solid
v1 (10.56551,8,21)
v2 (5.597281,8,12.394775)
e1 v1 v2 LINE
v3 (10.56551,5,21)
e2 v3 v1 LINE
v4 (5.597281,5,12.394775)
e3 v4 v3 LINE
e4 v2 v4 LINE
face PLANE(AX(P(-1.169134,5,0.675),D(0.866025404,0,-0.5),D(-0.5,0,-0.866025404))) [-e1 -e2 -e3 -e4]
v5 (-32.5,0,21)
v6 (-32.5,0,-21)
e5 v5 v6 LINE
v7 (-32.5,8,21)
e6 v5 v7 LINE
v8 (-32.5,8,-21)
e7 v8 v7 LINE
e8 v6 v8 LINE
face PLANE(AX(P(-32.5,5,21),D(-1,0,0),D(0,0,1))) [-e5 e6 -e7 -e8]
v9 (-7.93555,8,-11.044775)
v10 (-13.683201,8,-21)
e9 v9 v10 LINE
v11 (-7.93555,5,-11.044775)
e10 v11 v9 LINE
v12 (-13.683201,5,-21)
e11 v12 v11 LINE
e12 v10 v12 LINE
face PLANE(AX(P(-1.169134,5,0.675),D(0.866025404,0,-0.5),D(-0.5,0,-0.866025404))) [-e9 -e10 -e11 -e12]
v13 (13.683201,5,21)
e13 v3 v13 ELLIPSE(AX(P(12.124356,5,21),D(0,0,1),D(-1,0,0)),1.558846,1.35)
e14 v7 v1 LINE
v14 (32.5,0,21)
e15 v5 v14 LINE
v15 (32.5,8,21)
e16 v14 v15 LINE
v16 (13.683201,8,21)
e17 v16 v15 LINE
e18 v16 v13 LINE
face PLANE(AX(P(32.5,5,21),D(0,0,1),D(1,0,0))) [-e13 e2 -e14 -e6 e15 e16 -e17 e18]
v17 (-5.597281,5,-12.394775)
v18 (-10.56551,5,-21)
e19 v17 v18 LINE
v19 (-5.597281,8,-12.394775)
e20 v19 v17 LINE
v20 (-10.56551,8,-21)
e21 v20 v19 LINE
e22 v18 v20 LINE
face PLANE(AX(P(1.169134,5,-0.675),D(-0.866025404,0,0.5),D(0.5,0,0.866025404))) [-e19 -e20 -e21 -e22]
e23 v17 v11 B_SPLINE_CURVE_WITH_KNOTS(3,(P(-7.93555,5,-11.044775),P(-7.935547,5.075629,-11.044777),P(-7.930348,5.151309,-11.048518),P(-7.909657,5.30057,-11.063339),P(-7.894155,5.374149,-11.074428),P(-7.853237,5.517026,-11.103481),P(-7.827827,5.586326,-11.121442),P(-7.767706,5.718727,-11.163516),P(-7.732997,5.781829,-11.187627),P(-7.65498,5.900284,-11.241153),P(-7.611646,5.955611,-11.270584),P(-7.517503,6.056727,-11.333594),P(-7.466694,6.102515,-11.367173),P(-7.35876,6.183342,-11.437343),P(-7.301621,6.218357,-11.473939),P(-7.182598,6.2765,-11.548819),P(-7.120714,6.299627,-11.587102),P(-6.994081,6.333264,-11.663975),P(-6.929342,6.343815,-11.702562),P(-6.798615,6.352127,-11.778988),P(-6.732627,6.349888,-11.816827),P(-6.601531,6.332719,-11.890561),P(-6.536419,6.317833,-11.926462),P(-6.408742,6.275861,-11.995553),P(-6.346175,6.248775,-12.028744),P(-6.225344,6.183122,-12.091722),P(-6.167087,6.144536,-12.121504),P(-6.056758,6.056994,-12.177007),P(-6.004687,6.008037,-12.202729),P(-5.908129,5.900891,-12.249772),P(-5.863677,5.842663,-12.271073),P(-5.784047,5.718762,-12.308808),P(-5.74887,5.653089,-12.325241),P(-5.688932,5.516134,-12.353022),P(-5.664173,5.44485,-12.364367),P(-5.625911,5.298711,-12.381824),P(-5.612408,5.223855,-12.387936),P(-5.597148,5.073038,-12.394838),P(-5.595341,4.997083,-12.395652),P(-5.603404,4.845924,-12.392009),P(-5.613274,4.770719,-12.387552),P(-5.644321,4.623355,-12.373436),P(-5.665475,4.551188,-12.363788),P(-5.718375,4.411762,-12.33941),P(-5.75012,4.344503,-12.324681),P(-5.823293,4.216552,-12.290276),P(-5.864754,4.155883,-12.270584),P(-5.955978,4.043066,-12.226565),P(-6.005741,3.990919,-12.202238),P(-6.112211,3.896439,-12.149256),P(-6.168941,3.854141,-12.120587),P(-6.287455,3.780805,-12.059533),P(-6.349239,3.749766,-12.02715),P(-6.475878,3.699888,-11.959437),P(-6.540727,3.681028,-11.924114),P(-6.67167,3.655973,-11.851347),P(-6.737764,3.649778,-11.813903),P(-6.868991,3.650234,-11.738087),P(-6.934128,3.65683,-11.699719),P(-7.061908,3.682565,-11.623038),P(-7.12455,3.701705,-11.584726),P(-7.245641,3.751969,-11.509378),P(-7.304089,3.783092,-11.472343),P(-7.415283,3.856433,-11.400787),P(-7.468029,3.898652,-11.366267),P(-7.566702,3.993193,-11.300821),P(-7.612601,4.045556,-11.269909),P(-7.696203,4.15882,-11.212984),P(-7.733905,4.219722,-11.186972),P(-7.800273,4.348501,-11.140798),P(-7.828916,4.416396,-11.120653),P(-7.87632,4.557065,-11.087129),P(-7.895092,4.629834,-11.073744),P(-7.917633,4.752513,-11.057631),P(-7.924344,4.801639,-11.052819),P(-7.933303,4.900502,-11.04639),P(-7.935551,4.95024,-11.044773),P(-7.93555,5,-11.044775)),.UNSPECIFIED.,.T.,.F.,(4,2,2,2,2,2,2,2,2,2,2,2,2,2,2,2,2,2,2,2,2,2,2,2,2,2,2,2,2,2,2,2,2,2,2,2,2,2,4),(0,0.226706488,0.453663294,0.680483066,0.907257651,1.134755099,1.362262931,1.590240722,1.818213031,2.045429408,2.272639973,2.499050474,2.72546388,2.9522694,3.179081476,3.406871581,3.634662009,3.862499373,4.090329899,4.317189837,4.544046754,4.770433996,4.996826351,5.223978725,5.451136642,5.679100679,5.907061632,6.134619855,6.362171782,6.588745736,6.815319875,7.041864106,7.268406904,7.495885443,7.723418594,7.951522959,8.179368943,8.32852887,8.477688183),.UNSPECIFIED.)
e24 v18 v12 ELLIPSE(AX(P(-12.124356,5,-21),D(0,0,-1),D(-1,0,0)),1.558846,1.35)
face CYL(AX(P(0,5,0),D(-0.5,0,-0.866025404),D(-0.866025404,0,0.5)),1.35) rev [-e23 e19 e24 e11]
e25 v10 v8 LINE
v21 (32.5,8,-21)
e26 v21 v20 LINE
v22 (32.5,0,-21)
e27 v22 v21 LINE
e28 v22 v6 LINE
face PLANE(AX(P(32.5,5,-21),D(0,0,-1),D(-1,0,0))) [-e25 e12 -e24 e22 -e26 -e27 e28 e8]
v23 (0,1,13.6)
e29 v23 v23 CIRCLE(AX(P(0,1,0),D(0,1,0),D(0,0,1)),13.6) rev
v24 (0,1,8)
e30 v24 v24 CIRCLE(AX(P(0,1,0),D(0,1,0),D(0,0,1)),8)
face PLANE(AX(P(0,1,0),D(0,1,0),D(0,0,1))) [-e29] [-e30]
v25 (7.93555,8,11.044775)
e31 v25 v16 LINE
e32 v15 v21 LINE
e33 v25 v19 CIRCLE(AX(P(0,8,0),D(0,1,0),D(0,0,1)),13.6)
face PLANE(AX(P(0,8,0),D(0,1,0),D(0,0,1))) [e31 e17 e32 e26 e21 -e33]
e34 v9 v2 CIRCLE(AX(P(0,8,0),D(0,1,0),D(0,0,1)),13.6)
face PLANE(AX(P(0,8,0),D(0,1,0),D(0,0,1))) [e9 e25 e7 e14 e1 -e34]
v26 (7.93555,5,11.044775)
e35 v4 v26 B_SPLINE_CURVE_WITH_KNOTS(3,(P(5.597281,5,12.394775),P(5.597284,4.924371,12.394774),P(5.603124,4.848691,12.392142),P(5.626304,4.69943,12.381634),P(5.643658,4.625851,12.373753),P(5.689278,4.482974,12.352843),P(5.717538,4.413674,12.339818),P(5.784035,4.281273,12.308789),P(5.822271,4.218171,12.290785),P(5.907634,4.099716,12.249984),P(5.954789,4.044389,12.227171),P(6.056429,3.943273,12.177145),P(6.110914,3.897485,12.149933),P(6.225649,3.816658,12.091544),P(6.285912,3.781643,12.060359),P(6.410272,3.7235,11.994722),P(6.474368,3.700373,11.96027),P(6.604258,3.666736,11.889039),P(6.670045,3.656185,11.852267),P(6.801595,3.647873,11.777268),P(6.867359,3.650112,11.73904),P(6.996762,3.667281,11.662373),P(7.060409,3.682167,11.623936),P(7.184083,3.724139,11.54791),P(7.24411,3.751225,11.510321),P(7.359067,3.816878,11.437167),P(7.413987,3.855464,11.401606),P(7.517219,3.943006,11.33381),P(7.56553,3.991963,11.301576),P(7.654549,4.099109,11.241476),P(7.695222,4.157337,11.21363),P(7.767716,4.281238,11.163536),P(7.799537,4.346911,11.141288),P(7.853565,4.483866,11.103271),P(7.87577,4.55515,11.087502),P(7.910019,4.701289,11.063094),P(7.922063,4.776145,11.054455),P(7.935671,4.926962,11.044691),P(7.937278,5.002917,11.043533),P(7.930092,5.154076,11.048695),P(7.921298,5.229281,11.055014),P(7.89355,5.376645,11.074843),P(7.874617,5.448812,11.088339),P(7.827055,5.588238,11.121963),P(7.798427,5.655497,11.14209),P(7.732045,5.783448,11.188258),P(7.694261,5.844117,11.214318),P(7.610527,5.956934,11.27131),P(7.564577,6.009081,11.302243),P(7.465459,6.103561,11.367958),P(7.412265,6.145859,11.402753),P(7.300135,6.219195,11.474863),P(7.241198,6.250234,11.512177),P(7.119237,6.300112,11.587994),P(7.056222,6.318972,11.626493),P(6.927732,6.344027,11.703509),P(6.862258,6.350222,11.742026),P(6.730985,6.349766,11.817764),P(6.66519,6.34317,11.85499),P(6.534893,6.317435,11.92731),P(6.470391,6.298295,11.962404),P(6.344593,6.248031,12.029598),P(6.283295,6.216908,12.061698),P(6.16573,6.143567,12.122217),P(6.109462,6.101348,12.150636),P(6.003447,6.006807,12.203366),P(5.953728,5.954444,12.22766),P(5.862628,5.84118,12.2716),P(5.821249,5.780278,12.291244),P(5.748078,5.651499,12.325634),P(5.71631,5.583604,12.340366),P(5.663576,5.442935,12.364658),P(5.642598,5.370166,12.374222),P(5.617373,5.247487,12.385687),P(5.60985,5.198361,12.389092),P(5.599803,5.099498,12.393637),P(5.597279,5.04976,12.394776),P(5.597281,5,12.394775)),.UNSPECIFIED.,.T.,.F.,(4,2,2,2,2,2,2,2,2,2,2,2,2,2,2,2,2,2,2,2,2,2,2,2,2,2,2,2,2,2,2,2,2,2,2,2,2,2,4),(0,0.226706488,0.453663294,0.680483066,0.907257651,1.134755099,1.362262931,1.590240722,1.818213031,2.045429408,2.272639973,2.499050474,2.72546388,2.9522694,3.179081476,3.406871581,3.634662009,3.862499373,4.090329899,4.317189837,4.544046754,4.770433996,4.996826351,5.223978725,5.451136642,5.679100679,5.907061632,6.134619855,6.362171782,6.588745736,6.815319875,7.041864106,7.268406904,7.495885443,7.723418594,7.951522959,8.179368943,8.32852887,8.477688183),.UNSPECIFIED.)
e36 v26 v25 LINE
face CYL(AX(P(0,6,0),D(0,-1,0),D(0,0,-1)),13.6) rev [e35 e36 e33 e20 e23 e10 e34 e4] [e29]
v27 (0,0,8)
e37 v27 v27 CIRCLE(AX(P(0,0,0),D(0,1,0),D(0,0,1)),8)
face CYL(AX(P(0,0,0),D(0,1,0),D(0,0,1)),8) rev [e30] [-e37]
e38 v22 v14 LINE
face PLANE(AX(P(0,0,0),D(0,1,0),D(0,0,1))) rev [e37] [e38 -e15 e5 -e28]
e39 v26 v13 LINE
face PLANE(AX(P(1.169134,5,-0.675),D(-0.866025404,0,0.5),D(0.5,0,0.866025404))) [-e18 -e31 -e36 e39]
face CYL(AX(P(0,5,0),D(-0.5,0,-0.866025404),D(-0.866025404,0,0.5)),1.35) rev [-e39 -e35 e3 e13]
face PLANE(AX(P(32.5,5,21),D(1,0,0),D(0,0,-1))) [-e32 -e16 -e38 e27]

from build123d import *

# Parameters (mm, degrees)
SCHIZZO1_R                        = 27
ESTRUSIONE_ESTRUSIONE1_DEPTH      = 1
SCHIZZO2_R                        = 8
TAGLIO_ESTRUSIONE1_DEPTH          = 39.19685851
SCHIZZO3_R                        = 27
SCHIZZO3_R_2                      = 13.6
ESTRUSIONE_ESTRUSIONE2_DEPTH      = 5
ESTRUSIONE_ESTRUSIONE3_DEPTH      = 2
ESTRUSIONE_ESTRUSIONE3_DEPTH_BACK = 1
SCHIZZO5_W                        = 65
SCHIZZO5_H                        = 42
SCHIZZO5_R                        = 13.6
TAGLIO_ESTRUSIONE2_DEPTH          = 43.547032799
TAGLIO_ESTRUSIONE2_DEPTH_BACK     = 43.547032799
SCHIZZO3D1_R                      = 1.35
TAGLIO_ESTRUSIONE3_DEPTH          = 44.869308585
TAGLIO_ESTRUSIONE3_DEPTH_BACK     = 44.869308585
SCHIZZO8_W                        = 81.46070362
SCHIZZO8_H                        = 59.010327036
SCHIZZO8_W_2                      = 65
SCHIZZO8_H_2                      = 42
TAGLIO_ESTRUSIONE5_DEPTH          = 43.676105804
SCHIZZO10_W                       = 15.529437252
SCHIZZO10_H                       = 42
ESTRUSIONE_ESTRUSIONE4_DEPTH      = 5
SCHIZZO11_W                       = 15.529437252
SCHIZZO11_H                       = 42
ESTRUSIONE_ESTRUSIONE5_DEPTH      = 5


with BuildPart() as part:
    # Schizzo1 → Estrusione-Estrusione1 (new body)
    with BuildSketch(Plane(origin=(0, 0, 0), x_dir=(1, 0, 0), z_dir=(0, 1, 0))):
        Circle(SCHIZZO1_R)
    extrude(amount=ESTRUSIONE_ESTRUSIONE1_DEPTH)

    # Schizzo2 → Taglio-Estrusione1 (cut, through all)
    with BuildSketch(Plane(origin=(0, 1, 0), x_dir=(1, 0, 0), z_dir=(0, 1, 0))):
        Circle(SCHIZZO2_R)
    extrude(amount=-TAGLIO_ESTRUSIONE1_DEPTH, mode=Mode.SUBTRACT)

    # Schizzo3 → Estrusione-Estrusione2 (add)
    with BuildSketch(Plane(origin=(0, 1, 0), x_dir=(1, 0, 0), z_dir=(0, 1, 0))):
        Circle(SCHIZZO3_R)
        Circle(SCHIZZO3_R_2, mode=Mode.SUBTRACT)
    extrude(amount=ESTRUSIONE_ESTRUSIONE2_DEPTH)

    # Schizzo5 → Estrusione-Estrusione3 (add, two sides: drawn at the far end of the back side and taken through both)
    with BuildSketch(Plane(origin=(0, 6, 0), x_dir=(1, 0, 0), z_dir=(0, 1, 0)).offset(-ESTRUSIONE_ESTRUSIONE3_DEPTH_BACK)):
        Rectangle(SCHIZZO5_W, SCHIZZO5_H)
        Circle(SCHIZZO5_R, mode=Mode.SUBTRACT)
    extrude(amount=ESTRUSIONE_ESTRUSIONE3_DEPTH + ESTRUSIONE_ESTRUSIONE3_DEPTH_BACK)

    # Schizzo3D1 → Taglio-Estrusione2 (cut, two sides: drawn at the far end of the back side and taken through both)
    with BuildSketch(Plane(origin=(0, 5, 0), x_dir=(-0.8660254037844382, 0, 0.500000000000001), z_dir=(-0.500000000000001, 0, -0.866025403784438)).offset(-TAGLIO_ESTRUSIONE2_DEPTH_BACK)):
        Circle(SCHIZZO3D1_R)
    extrude(amount=TAGLIO_ESTRUSIONE2_DEPTH + TAGLIO_ESTRUSIONE2_DEPTH_BACK, mode=Mode.SUBTRACT)

    # Schizzo3D2 → Taglio-Estrusione3 (cut, two sides: drawn at the far end of the back side and taken through both)
    with BuildSketch(Plane(origin=(1.169134295, 5, -0.675), x_dir=(-0.41149103074101084, 0.8799053976571924, 0.23757445736745078), z_dir=(-0.5000000000000011, 1.0747888534457561e-14, -0.866025403784438)).offset(-TAGLIO_ESTRUSIONE3_DEPTH_BACK)):
        Polygon((0, 0), (1.28290207, -2.375744574), (5.682429058, 0), (4.399526988, 2.375744574), align=None)
    extrude(amount=TAGLIO_ESTRUSIONE3_DEPTH + TAGLIO_ESTRUSIONE3_DEPTH_BACK, mode=Mode.SUBTRACT)

    # Schizzo8 → Taglio-Estrusione5 (cut, through all)
    with BuildSketch(Plane(origin=(0, 6, 0), x_dir=(1, 0, 0), z_dir=(0, 1, 0))):
        Rectangle(SCHIZZO8_W, SCHIZZO8_H)
        Rectangle(SCHIZZO8_W_2, SCHIZZO8_H_2, mode=Mode.SUBTRACT)
    extrude(amount=-TAGLIO_ESTRUSIONE5_DEPTH, mode=Mode.SUBTRACT)

    # Schizzo10 → Estrusione-Estrusione4 (add)
    with BuildSketch(Plane.XZ.offset(-5)):
        with Locations((-24.735281374, 0)):
            Rectangle(SCHIZZO10_W, SCHIZZO10_H)
    extrude(amount=ESTRUSIONE_ESTRUSIONE4_DEPTH)

    # Schizzo11 → Estrusione-Estrusione5 (add)
    with BuildSketch(Plane.XZ.offset(-5)):
        with Locations((24.735281374, 0)):
            Rectangle(SCHIZZO11_W, SCHIZZO11_H)
    extrude(amount=ESTRUSIONE_ESTRUSIONE5_DEPTH)


solid = part.part
